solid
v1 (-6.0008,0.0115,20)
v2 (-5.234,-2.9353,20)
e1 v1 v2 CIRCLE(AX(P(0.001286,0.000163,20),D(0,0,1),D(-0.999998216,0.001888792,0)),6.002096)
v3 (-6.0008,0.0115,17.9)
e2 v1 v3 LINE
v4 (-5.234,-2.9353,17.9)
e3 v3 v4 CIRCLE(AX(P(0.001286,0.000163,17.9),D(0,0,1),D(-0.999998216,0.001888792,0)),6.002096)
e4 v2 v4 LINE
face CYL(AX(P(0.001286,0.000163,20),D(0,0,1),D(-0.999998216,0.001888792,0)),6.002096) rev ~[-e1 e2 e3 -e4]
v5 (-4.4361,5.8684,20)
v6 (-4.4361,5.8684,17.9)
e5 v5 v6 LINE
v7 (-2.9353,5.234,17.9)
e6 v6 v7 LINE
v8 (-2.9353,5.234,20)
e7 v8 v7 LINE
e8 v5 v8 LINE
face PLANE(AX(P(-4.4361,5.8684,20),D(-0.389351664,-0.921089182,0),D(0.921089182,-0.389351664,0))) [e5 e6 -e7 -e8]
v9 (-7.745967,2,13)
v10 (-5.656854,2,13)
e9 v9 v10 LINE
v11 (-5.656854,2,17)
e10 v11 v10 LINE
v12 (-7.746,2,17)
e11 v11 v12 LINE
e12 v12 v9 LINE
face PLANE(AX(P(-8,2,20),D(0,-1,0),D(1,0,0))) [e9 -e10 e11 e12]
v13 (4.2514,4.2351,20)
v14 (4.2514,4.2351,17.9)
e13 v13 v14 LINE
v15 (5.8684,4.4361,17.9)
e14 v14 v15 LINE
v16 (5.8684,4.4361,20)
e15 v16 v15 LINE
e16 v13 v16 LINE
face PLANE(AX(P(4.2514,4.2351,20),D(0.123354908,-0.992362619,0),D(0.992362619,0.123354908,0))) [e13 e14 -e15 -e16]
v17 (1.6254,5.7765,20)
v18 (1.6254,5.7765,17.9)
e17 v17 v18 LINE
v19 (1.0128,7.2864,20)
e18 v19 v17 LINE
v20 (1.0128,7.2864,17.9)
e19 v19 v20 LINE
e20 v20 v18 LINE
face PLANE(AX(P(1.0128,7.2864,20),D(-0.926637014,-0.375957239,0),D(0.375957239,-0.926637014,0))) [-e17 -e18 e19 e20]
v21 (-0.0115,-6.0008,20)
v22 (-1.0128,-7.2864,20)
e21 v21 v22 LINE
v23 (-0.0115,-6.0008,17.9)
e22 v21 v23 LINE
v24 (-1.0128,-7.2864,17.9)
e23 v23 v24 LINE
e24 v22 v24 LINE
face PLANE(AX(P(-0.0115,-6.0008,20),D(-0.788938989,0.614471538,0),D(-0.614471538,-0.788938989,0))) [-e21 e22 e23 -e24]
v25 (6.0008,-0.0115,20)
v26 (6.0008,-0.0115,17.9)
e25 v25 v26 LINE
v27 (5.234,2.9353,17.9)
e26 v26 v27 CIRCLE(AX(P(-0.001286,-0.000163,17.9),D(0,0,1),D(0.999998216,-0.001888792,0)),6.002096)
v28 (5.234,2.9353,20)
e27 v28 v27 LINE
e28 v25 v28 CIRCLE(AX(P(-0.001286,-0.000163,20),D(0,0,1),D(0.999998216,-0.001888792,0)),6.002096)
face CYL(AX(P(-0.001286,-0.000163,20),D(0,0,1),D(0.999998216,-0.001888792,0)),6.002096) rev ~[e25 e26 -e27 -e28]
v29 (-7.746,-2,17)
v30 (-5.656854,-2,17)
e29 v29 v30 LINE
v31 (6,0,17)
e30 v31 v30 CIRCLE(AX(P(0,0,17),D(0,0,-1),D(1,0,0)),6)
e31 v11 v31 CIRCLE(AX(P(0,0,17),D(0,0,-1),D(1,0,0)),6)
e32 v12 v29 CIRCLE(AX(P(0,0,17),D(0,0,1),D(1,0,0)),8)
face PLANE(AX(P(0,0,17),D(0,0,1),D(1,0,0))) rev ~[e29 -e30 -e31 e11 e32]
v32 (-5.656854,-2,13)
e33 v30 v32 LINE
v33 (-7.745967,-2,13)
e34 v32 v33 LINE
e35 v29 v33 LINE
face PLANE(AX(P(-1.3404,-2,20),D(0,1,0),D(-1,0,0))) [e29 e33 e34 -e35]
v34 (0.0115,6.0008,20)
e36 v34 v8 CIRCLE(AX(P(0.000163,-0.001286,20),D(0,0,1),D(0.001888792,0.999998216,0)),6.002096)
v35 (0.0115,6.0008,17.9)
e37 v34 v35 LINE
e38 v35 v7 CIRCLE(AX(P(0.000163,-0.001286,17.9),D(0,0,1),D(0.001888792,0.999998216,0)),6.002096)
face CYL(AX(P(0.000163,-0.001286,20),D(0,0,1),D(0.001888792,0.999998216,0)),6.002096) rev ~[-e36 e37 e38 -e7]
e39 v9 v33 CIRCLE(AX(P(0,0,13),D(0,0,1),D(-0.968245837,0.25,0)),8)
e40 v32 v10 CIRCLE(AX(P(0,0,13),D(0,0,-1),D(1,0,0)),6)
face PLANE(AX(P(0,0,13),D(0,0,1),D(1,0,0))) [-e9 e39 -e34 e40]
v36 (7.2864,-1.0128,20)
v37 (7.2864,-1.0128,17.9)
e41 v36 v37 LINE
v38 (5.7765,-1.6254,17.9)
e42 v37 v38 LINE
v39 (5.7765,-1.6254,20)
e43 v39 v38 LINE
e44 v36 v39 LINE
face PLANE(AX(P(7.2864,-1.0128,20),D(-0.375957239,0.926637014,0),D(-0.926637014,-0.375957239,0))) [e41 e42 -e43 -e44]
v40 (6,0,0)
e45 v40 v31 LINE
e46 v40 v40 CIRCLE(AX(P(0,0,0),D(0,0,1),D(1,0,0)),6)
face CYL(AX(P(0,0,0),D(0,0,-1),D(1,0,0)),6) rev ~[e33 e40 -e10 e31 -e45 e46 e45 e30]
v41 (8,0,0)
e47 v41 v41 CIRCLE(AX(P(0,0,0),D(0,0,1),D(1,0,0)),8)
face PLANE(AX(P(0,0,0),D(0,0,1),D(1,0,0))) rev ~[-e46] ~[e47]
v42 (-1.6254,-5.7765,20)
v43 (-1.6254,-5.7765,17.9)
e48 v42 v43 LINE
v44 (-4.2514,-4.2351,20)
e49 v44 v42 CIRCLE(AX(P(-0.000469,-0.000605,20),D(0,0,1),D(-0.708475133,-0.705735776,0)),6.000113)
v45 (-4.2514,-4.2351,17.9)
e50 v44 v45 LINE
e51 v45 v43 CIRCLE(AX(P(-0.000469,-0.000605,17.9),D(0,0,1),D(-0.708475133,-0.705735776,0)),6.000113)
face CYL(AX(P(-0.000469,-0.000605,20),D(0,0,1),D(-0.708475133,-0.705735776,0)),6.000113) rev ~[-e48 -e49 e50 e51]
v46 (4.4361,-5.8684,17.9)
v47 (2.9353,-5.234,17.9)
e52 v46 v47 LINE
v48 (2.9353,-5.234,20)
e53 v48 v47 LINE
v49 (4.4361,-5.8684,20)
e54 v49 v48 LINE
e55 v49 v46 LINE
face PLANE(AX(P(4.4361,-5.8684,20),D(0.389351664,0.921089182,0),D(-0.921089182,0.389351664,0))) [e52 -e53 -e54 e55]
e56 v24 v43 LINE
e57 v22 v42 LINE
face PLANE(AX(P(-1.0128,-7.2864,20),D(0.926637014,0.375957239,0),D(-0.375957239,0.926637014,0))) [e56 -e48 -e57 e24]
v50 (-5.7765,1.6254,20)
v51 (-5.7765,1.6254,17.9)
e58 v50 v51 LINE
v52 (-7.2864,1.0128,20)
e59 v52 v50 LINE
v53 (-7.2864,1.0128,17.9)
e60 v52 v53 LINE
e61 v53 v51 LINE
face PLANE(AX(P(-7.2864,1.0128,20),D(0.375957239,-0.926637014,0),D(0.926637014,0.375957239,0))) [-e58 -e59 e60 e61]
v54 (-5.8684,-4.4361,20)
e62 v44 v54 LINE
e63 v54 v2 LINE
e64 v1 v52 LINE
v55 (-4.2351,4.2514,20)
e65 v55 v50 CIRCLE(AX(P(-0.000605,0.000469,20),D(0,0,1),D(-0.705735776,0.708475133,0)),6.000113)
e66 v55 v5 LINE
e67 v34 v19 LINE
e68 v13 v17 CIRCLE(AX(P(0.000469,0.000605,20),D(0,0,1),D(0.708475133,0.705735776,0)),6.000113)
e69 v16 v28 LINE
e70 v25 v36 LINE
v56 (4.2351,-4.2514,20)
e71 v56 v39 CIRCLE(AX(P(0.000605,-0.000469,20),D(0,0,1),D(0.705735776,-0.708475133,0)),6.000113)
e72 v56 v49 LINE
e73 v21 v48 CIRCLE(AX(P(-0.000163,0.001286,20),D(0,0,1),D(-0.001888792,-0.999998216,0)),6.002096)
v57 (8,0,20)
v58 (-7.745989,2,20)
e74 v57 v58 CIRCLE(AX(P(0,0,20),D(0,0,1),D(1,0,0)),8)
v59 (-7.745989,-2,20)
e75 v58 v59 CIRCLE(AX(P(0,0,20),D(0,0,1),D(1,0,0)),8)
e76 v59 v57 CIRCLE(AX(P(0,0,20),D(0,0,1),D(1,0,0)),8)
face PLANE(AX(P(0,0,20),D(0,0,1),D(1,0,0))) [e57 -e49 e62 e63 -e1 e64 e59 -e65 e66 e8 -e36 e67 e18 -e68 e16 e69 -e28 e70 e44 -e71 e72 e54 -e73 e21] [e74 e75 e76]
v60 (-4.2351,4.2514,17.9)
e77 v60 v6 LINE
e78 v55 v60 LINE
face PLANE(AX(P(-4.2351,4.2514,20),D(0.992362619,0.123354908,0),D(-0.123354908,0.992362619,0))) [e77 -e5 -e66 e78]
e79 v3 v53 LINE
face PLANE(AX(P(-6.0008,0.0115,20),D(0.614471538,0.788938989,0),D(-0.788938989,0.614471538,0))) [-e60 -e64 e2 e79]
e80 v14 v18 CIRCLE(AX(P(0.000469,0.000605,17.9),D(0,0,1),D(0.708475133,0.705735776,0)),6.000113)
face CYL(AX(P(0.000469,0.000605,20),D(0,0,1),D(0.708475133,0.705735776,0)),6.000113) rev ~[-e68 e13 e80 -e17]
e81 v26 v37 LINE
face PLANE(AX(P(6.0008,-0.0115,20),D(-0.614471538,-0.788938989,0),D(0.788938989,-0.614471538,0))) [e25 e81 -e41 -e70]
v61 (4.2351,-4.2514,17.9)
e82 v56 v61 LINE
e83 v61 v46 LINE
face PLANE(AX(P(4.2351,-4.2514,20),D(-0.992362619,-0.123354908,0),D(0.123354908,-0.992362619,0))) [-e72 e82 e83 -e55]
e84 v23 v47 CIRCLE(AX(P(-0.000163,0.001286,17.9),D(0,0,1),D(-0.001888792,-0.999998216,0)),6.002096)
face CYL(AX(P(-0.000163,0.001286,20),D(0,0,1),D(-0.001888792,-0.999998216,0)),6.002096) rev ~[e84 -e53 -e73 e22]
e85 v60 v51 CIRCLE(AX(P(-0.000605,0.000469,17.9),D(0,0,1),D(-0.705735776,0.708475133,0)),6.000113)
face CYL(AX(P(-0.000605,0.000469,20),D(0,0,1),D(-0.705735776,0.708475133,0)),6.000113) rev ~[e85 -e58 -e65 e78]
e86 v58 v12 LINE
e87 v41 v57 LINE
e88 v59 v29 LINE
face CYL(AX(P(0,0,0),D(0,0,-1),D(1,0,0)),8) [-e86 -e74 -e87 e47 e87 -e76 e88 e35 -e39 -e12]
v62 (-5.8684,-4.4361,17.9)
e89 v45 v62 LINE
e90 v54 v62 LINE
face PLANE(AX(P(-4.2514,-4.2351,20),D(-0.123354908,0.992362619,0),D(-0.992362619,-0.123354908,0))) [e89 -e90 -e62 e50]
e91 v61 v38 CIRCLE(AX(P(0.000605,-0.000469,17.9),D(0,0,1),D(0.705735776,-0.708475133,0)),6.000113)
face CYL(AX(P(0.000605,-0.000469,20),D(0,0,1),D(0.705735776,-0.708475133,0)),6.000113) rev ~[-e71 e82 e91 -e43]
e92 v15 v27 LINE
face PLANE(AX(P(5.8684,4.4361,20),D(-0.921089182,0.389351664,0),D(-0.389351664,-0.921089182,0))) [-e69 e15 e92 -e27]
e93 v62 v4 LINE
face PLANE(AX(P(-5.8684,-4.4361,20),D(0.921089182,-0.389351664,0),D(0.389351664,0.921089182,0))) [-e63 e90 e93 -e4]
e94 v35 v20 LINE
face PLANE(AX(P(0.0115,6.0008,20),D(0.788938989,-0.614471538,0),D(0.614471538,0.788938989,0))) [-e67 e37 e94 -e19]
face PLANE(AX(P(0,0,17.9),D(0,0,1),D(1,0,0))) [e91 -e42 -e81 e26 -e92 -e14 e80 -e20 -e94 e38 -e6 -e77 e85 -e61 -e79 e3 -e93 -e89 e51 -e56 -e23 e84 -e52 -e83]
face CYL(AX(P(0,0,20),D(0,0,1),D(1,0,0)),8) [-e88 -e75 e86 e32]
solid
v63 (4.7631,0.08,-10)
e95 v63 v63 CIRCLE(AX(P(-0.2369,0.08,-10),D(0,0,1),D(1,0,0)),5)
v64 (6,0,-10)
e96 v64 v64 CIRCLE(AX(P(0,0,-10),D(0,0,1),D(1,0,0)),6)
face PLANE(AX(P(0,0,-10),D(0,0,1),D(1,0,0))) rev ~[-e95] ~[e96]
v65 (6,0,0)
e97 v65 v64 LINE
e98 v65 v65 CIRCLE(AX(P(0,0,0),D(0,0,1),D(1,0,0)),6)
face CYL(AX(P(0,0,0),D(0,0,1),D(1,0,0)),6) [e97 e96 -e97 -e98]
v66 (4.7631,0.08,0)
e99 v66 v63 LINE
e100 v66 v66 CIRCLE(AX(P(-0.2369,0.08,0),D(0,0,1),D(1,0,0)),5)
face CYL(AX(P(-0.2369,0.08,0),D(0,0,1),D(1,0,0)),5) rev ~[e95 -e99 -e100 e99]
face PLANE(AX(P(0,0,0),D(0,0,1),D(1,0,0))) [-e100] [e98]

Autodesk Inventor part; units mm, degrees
ref_plane "YZ Plane" through (0, 0, 0) normal (1, 0, 0) x (0, 1, 0)
ref_plane "XZ Plane" through (0, 0, 0) normal (0, 1, 0) x (-1, 0, 0)
ref_plane "XY Plane" through (0, 0, 0) normal (0, 0, 1) x (1, 0, 0)
sketch "Sketch1" plane through (0, 0, 0) normal (0, 0, 1) x (1, 0, 0)
  circle A0 centre (0, 0) radius 6.1 projected
  circle A1 centre (0, 0) radius 8 projected
  circle A2 centre (0, 0) radius 6.1 projected
  circle A3 centre (0, 0) radius 6
  circle A4 centre (-0.2369, 0.08) radius 5 projected
  circle A5 centre (-0.2369, 0.08) radius 5 projected
  point P0 (0, 0)
  dimension "d0" = 0.1
extrude "Extrusion1" add sketch "Sketch1" against normal blind 10 contours A3
sketch "Sketch2" plane through (0, 0, 0) normal (0, 0, 1) x (1, 0, 0)
  circle A0 centre (0, 0) radius 6.1 projected
  circle A1 centre (0, 0) radius 8 projected
  circle A2 centre (0, 0) radius 6 projected
  point P0 (0, 0)
extrude "Extrusion2" add sketch "Sketch2" along normal blind 20 contours A0 | A1
sketch "Sketch3" plane through (0, 0, 20) normal (0, 0, 1) x (1, 0, 0)
  line L0 (-1.3404, -2) -> (-8, -2)
  line L1 (-8, -2) -> (-8, 2)
  line L2 (-8, 2) -> (-1.3404, 2)
  line L3 (-1.3404, 2) -> (-1.3404, -2)
  line L4 (-1.3404, -2) -> (-8, 2) construction
  line L5 (-8, -2) -> (-1.3404, 2) construction
  point P0 (0, 0)
  point P1 (-4.6702, 0)
  dimension "d5" = 4
extrude "Extrusion3" cut sketch "Sketch3" against normal blind 7
sketch "Sketch4" plane through (0, 0, 20) normal (0, 0, 1) x (1, 0, 0)
  line L0 (-5.6569, -2) -> (-7.746, -2) projected
  arc A0 (-7.746, -2) -> (-7.746, 2) centre (0, 0) ccw projected
  line L1 (-7.746, 2) -> (-5.6569, 2) projected
  arc A1 (-5.6569, -2) -> (-5.6569, 2) centre (0, 0) ccw projected
  circle A2 centre (0, 0) radius 8
  point P0 (0, 0)
  point P1 (-7.746, 2)
extrude "Extrusion4" add sketch "Sketch4" against normal blind 3
sketch "Sketch6" plane through (0, 0, 20) normal (0, 0, 1) x (1, 0, 0)
  circle A0 centre (0, 0) radius 8 projected
  arc A1 (-4.1289, 4.2146) -> (-5.6926, 1.5507) centre (0, 0) ccw projected
  line L0 (-5.6926, 1.5507) -> (-7.0866, 0.985) projected
  line L1 (-7.0866, 0.985) -> (-5.8997, 0.0606) projected
  arc A2 (-5.8997, 0.0606) -> (-5.1217, -2.9288) centre (0, 0) ccw projected
  line L2 (-5.1217, -2.9288) -> (-5.7075, -4.3145) projected
  line L3 (-5.7075, -4.3145) -> (-4.2146, -4.1289) projected
  arc A3 (-4.2146, -4.1289) -> (-1.5507, -5.6926) centre (0, 0) ccw projected
  line L4 (-1.5507, -5.6926) -> (-0.985, -7.0866) projected
  line L5 (-0.985, -7.0866) -> (-0.0606, -5.8997) projected
  arc A4 (-0.0606, -5.8997) -> (2.9288, -5.1217) centre (0, 0) ccw projected
  line L6 (2.9288, -5.1217) -> (4.3145, -5.7075) projected
  line L7 (4.3145, -5.7075) -> (4.1289, -4.2146) projected
  arc A5 (4.1289, -4.2146) -> (5.6926, -1.5507) centre (0, 0) ccw projected
  line L8 (5.6926, -1.5507) -> (7.0866, -0.985) projected
  line L9 (7.0866, -0.985) -> (5.8997, -0.0606) projected
  arc A6 (5.8997, -0.0606) -> (5.1217, 2.9288) centre (0, 0) ccw projected
  line L10 (5.1217, 2.9288) -> (5.7075, 4.3145) projected
  line L11 (5.7075, 4.3145) -> (4.2146, 4.1289) projected
  arc A7 (4.2146, 4.1289) -> (1.5507, 5.6926) centre (0, 0) ccw projected
  line L12 (1.5507, 5.6926) -> (0.985, 7.0866) projected
  line L13 (0.985, 7.0866) -> (0.0606, 5.8997) projected
  arc A8 (0.0606, 5.8997) -> (-2.9288, 5.1217) centre (0, 0) ccw projected
  line L14 (-2.9288, 5.1217) -> (-4.3145, 5.7075) projected
  line L15 (-4.3145, 5.7075) -> (-4.1289, 4.2146) projected
  arc A9 (4.2351, -4.2514) -> (5.7765, -1.6254) centre (0, 0) ccw
  line L16 (4.2351, -4.2514) -> (4.4361, -5.8684)
  line L17 (4.4361, -5.8684) -> (2.9353, -5.234)
  arc A10 (-0.0115, -6.0008) -> (2.9353, -5.234) centre (0, 0) ccw
  line L18 (-0.0115, -6.0008) -> (-1.0128, -7.2864)
  line L19 (-1.0128, -7.2864) -> (-1.6254, -5.7765)
  arc A11 (-4.2514, -4.2351) -> (-1.6254, -5.7765) centre (0, 0) ccw
  line L20 (-4.2514, -4.2351) -> (-5.8684, -4.4361)
  line L21 (-5.8684, -4.4361) -> (-5.234, -2.9353)
  arc A12 (-6.0008, 0.0115) -> (-5.234, -2.9353) centre (0, 0) ccw
  line L22 (-6.0008, 0.0115) -> (-7.2864, 1.0128)
  line L23 (-7.2864, 1.0128) -> (-5.7765, 1.6254)
  arc A13 (-4.2351, 4.2514) -> (-5.7765, 1.6254) centre (0, 0) ccw
  line L24 (-4.2351, 4.2514) -> (-4.4361, 5.8684)
  line L25 (-4.4361, 5.8684) -> (-2.9353, 5.234)
  arc A14 (0.0115, 6.0008) -> (-2.9353, 5.234) centre (0, 0) ccw
  line L26 (0.0115, 6.0008) -> (1.0128, 7.2864)
  line L27 (1.0128, 7.2864) -> (1.6254, 5.7765)
  arc A15 (4.2514, 4.2351) -> (1.6254, 5.7765) centre (0, 0) ccw
  line L28 (4.2514, 4.2351) -> (5.8684, 4.4361)
  line L29 (5.8684, 4.4361) -> (5.234, 2.9353)
  arc A16 (6.0008, -0.0115) -> (5.234, 2.9353) centre (0, 0) ccw
  line L30 (6.0008, -0.0115) -> (7.2864, -1.0128)
  line L31 (7.2864, -1.0128) -> (5.7765, -1.6254)
  point P0 (0, 0)
extrude "Extrusion5" cut sketch "Sketch6" against normal blind 2.1 contours L15 L14 A8 L13 L12 A7 L11 L10 A6 L9 L8 A5 L7 L6 A4 L5 L4 A3 L3 L2 A2 L1 L0 A1 | L16 L17 A10 L18 L19 A11 L20 L21 A12 L22 L23 A13 L24 L25 A14 L26 L27 A15 L28 L29 A16 L30 L31 A9
properties part number "handle_base3"
